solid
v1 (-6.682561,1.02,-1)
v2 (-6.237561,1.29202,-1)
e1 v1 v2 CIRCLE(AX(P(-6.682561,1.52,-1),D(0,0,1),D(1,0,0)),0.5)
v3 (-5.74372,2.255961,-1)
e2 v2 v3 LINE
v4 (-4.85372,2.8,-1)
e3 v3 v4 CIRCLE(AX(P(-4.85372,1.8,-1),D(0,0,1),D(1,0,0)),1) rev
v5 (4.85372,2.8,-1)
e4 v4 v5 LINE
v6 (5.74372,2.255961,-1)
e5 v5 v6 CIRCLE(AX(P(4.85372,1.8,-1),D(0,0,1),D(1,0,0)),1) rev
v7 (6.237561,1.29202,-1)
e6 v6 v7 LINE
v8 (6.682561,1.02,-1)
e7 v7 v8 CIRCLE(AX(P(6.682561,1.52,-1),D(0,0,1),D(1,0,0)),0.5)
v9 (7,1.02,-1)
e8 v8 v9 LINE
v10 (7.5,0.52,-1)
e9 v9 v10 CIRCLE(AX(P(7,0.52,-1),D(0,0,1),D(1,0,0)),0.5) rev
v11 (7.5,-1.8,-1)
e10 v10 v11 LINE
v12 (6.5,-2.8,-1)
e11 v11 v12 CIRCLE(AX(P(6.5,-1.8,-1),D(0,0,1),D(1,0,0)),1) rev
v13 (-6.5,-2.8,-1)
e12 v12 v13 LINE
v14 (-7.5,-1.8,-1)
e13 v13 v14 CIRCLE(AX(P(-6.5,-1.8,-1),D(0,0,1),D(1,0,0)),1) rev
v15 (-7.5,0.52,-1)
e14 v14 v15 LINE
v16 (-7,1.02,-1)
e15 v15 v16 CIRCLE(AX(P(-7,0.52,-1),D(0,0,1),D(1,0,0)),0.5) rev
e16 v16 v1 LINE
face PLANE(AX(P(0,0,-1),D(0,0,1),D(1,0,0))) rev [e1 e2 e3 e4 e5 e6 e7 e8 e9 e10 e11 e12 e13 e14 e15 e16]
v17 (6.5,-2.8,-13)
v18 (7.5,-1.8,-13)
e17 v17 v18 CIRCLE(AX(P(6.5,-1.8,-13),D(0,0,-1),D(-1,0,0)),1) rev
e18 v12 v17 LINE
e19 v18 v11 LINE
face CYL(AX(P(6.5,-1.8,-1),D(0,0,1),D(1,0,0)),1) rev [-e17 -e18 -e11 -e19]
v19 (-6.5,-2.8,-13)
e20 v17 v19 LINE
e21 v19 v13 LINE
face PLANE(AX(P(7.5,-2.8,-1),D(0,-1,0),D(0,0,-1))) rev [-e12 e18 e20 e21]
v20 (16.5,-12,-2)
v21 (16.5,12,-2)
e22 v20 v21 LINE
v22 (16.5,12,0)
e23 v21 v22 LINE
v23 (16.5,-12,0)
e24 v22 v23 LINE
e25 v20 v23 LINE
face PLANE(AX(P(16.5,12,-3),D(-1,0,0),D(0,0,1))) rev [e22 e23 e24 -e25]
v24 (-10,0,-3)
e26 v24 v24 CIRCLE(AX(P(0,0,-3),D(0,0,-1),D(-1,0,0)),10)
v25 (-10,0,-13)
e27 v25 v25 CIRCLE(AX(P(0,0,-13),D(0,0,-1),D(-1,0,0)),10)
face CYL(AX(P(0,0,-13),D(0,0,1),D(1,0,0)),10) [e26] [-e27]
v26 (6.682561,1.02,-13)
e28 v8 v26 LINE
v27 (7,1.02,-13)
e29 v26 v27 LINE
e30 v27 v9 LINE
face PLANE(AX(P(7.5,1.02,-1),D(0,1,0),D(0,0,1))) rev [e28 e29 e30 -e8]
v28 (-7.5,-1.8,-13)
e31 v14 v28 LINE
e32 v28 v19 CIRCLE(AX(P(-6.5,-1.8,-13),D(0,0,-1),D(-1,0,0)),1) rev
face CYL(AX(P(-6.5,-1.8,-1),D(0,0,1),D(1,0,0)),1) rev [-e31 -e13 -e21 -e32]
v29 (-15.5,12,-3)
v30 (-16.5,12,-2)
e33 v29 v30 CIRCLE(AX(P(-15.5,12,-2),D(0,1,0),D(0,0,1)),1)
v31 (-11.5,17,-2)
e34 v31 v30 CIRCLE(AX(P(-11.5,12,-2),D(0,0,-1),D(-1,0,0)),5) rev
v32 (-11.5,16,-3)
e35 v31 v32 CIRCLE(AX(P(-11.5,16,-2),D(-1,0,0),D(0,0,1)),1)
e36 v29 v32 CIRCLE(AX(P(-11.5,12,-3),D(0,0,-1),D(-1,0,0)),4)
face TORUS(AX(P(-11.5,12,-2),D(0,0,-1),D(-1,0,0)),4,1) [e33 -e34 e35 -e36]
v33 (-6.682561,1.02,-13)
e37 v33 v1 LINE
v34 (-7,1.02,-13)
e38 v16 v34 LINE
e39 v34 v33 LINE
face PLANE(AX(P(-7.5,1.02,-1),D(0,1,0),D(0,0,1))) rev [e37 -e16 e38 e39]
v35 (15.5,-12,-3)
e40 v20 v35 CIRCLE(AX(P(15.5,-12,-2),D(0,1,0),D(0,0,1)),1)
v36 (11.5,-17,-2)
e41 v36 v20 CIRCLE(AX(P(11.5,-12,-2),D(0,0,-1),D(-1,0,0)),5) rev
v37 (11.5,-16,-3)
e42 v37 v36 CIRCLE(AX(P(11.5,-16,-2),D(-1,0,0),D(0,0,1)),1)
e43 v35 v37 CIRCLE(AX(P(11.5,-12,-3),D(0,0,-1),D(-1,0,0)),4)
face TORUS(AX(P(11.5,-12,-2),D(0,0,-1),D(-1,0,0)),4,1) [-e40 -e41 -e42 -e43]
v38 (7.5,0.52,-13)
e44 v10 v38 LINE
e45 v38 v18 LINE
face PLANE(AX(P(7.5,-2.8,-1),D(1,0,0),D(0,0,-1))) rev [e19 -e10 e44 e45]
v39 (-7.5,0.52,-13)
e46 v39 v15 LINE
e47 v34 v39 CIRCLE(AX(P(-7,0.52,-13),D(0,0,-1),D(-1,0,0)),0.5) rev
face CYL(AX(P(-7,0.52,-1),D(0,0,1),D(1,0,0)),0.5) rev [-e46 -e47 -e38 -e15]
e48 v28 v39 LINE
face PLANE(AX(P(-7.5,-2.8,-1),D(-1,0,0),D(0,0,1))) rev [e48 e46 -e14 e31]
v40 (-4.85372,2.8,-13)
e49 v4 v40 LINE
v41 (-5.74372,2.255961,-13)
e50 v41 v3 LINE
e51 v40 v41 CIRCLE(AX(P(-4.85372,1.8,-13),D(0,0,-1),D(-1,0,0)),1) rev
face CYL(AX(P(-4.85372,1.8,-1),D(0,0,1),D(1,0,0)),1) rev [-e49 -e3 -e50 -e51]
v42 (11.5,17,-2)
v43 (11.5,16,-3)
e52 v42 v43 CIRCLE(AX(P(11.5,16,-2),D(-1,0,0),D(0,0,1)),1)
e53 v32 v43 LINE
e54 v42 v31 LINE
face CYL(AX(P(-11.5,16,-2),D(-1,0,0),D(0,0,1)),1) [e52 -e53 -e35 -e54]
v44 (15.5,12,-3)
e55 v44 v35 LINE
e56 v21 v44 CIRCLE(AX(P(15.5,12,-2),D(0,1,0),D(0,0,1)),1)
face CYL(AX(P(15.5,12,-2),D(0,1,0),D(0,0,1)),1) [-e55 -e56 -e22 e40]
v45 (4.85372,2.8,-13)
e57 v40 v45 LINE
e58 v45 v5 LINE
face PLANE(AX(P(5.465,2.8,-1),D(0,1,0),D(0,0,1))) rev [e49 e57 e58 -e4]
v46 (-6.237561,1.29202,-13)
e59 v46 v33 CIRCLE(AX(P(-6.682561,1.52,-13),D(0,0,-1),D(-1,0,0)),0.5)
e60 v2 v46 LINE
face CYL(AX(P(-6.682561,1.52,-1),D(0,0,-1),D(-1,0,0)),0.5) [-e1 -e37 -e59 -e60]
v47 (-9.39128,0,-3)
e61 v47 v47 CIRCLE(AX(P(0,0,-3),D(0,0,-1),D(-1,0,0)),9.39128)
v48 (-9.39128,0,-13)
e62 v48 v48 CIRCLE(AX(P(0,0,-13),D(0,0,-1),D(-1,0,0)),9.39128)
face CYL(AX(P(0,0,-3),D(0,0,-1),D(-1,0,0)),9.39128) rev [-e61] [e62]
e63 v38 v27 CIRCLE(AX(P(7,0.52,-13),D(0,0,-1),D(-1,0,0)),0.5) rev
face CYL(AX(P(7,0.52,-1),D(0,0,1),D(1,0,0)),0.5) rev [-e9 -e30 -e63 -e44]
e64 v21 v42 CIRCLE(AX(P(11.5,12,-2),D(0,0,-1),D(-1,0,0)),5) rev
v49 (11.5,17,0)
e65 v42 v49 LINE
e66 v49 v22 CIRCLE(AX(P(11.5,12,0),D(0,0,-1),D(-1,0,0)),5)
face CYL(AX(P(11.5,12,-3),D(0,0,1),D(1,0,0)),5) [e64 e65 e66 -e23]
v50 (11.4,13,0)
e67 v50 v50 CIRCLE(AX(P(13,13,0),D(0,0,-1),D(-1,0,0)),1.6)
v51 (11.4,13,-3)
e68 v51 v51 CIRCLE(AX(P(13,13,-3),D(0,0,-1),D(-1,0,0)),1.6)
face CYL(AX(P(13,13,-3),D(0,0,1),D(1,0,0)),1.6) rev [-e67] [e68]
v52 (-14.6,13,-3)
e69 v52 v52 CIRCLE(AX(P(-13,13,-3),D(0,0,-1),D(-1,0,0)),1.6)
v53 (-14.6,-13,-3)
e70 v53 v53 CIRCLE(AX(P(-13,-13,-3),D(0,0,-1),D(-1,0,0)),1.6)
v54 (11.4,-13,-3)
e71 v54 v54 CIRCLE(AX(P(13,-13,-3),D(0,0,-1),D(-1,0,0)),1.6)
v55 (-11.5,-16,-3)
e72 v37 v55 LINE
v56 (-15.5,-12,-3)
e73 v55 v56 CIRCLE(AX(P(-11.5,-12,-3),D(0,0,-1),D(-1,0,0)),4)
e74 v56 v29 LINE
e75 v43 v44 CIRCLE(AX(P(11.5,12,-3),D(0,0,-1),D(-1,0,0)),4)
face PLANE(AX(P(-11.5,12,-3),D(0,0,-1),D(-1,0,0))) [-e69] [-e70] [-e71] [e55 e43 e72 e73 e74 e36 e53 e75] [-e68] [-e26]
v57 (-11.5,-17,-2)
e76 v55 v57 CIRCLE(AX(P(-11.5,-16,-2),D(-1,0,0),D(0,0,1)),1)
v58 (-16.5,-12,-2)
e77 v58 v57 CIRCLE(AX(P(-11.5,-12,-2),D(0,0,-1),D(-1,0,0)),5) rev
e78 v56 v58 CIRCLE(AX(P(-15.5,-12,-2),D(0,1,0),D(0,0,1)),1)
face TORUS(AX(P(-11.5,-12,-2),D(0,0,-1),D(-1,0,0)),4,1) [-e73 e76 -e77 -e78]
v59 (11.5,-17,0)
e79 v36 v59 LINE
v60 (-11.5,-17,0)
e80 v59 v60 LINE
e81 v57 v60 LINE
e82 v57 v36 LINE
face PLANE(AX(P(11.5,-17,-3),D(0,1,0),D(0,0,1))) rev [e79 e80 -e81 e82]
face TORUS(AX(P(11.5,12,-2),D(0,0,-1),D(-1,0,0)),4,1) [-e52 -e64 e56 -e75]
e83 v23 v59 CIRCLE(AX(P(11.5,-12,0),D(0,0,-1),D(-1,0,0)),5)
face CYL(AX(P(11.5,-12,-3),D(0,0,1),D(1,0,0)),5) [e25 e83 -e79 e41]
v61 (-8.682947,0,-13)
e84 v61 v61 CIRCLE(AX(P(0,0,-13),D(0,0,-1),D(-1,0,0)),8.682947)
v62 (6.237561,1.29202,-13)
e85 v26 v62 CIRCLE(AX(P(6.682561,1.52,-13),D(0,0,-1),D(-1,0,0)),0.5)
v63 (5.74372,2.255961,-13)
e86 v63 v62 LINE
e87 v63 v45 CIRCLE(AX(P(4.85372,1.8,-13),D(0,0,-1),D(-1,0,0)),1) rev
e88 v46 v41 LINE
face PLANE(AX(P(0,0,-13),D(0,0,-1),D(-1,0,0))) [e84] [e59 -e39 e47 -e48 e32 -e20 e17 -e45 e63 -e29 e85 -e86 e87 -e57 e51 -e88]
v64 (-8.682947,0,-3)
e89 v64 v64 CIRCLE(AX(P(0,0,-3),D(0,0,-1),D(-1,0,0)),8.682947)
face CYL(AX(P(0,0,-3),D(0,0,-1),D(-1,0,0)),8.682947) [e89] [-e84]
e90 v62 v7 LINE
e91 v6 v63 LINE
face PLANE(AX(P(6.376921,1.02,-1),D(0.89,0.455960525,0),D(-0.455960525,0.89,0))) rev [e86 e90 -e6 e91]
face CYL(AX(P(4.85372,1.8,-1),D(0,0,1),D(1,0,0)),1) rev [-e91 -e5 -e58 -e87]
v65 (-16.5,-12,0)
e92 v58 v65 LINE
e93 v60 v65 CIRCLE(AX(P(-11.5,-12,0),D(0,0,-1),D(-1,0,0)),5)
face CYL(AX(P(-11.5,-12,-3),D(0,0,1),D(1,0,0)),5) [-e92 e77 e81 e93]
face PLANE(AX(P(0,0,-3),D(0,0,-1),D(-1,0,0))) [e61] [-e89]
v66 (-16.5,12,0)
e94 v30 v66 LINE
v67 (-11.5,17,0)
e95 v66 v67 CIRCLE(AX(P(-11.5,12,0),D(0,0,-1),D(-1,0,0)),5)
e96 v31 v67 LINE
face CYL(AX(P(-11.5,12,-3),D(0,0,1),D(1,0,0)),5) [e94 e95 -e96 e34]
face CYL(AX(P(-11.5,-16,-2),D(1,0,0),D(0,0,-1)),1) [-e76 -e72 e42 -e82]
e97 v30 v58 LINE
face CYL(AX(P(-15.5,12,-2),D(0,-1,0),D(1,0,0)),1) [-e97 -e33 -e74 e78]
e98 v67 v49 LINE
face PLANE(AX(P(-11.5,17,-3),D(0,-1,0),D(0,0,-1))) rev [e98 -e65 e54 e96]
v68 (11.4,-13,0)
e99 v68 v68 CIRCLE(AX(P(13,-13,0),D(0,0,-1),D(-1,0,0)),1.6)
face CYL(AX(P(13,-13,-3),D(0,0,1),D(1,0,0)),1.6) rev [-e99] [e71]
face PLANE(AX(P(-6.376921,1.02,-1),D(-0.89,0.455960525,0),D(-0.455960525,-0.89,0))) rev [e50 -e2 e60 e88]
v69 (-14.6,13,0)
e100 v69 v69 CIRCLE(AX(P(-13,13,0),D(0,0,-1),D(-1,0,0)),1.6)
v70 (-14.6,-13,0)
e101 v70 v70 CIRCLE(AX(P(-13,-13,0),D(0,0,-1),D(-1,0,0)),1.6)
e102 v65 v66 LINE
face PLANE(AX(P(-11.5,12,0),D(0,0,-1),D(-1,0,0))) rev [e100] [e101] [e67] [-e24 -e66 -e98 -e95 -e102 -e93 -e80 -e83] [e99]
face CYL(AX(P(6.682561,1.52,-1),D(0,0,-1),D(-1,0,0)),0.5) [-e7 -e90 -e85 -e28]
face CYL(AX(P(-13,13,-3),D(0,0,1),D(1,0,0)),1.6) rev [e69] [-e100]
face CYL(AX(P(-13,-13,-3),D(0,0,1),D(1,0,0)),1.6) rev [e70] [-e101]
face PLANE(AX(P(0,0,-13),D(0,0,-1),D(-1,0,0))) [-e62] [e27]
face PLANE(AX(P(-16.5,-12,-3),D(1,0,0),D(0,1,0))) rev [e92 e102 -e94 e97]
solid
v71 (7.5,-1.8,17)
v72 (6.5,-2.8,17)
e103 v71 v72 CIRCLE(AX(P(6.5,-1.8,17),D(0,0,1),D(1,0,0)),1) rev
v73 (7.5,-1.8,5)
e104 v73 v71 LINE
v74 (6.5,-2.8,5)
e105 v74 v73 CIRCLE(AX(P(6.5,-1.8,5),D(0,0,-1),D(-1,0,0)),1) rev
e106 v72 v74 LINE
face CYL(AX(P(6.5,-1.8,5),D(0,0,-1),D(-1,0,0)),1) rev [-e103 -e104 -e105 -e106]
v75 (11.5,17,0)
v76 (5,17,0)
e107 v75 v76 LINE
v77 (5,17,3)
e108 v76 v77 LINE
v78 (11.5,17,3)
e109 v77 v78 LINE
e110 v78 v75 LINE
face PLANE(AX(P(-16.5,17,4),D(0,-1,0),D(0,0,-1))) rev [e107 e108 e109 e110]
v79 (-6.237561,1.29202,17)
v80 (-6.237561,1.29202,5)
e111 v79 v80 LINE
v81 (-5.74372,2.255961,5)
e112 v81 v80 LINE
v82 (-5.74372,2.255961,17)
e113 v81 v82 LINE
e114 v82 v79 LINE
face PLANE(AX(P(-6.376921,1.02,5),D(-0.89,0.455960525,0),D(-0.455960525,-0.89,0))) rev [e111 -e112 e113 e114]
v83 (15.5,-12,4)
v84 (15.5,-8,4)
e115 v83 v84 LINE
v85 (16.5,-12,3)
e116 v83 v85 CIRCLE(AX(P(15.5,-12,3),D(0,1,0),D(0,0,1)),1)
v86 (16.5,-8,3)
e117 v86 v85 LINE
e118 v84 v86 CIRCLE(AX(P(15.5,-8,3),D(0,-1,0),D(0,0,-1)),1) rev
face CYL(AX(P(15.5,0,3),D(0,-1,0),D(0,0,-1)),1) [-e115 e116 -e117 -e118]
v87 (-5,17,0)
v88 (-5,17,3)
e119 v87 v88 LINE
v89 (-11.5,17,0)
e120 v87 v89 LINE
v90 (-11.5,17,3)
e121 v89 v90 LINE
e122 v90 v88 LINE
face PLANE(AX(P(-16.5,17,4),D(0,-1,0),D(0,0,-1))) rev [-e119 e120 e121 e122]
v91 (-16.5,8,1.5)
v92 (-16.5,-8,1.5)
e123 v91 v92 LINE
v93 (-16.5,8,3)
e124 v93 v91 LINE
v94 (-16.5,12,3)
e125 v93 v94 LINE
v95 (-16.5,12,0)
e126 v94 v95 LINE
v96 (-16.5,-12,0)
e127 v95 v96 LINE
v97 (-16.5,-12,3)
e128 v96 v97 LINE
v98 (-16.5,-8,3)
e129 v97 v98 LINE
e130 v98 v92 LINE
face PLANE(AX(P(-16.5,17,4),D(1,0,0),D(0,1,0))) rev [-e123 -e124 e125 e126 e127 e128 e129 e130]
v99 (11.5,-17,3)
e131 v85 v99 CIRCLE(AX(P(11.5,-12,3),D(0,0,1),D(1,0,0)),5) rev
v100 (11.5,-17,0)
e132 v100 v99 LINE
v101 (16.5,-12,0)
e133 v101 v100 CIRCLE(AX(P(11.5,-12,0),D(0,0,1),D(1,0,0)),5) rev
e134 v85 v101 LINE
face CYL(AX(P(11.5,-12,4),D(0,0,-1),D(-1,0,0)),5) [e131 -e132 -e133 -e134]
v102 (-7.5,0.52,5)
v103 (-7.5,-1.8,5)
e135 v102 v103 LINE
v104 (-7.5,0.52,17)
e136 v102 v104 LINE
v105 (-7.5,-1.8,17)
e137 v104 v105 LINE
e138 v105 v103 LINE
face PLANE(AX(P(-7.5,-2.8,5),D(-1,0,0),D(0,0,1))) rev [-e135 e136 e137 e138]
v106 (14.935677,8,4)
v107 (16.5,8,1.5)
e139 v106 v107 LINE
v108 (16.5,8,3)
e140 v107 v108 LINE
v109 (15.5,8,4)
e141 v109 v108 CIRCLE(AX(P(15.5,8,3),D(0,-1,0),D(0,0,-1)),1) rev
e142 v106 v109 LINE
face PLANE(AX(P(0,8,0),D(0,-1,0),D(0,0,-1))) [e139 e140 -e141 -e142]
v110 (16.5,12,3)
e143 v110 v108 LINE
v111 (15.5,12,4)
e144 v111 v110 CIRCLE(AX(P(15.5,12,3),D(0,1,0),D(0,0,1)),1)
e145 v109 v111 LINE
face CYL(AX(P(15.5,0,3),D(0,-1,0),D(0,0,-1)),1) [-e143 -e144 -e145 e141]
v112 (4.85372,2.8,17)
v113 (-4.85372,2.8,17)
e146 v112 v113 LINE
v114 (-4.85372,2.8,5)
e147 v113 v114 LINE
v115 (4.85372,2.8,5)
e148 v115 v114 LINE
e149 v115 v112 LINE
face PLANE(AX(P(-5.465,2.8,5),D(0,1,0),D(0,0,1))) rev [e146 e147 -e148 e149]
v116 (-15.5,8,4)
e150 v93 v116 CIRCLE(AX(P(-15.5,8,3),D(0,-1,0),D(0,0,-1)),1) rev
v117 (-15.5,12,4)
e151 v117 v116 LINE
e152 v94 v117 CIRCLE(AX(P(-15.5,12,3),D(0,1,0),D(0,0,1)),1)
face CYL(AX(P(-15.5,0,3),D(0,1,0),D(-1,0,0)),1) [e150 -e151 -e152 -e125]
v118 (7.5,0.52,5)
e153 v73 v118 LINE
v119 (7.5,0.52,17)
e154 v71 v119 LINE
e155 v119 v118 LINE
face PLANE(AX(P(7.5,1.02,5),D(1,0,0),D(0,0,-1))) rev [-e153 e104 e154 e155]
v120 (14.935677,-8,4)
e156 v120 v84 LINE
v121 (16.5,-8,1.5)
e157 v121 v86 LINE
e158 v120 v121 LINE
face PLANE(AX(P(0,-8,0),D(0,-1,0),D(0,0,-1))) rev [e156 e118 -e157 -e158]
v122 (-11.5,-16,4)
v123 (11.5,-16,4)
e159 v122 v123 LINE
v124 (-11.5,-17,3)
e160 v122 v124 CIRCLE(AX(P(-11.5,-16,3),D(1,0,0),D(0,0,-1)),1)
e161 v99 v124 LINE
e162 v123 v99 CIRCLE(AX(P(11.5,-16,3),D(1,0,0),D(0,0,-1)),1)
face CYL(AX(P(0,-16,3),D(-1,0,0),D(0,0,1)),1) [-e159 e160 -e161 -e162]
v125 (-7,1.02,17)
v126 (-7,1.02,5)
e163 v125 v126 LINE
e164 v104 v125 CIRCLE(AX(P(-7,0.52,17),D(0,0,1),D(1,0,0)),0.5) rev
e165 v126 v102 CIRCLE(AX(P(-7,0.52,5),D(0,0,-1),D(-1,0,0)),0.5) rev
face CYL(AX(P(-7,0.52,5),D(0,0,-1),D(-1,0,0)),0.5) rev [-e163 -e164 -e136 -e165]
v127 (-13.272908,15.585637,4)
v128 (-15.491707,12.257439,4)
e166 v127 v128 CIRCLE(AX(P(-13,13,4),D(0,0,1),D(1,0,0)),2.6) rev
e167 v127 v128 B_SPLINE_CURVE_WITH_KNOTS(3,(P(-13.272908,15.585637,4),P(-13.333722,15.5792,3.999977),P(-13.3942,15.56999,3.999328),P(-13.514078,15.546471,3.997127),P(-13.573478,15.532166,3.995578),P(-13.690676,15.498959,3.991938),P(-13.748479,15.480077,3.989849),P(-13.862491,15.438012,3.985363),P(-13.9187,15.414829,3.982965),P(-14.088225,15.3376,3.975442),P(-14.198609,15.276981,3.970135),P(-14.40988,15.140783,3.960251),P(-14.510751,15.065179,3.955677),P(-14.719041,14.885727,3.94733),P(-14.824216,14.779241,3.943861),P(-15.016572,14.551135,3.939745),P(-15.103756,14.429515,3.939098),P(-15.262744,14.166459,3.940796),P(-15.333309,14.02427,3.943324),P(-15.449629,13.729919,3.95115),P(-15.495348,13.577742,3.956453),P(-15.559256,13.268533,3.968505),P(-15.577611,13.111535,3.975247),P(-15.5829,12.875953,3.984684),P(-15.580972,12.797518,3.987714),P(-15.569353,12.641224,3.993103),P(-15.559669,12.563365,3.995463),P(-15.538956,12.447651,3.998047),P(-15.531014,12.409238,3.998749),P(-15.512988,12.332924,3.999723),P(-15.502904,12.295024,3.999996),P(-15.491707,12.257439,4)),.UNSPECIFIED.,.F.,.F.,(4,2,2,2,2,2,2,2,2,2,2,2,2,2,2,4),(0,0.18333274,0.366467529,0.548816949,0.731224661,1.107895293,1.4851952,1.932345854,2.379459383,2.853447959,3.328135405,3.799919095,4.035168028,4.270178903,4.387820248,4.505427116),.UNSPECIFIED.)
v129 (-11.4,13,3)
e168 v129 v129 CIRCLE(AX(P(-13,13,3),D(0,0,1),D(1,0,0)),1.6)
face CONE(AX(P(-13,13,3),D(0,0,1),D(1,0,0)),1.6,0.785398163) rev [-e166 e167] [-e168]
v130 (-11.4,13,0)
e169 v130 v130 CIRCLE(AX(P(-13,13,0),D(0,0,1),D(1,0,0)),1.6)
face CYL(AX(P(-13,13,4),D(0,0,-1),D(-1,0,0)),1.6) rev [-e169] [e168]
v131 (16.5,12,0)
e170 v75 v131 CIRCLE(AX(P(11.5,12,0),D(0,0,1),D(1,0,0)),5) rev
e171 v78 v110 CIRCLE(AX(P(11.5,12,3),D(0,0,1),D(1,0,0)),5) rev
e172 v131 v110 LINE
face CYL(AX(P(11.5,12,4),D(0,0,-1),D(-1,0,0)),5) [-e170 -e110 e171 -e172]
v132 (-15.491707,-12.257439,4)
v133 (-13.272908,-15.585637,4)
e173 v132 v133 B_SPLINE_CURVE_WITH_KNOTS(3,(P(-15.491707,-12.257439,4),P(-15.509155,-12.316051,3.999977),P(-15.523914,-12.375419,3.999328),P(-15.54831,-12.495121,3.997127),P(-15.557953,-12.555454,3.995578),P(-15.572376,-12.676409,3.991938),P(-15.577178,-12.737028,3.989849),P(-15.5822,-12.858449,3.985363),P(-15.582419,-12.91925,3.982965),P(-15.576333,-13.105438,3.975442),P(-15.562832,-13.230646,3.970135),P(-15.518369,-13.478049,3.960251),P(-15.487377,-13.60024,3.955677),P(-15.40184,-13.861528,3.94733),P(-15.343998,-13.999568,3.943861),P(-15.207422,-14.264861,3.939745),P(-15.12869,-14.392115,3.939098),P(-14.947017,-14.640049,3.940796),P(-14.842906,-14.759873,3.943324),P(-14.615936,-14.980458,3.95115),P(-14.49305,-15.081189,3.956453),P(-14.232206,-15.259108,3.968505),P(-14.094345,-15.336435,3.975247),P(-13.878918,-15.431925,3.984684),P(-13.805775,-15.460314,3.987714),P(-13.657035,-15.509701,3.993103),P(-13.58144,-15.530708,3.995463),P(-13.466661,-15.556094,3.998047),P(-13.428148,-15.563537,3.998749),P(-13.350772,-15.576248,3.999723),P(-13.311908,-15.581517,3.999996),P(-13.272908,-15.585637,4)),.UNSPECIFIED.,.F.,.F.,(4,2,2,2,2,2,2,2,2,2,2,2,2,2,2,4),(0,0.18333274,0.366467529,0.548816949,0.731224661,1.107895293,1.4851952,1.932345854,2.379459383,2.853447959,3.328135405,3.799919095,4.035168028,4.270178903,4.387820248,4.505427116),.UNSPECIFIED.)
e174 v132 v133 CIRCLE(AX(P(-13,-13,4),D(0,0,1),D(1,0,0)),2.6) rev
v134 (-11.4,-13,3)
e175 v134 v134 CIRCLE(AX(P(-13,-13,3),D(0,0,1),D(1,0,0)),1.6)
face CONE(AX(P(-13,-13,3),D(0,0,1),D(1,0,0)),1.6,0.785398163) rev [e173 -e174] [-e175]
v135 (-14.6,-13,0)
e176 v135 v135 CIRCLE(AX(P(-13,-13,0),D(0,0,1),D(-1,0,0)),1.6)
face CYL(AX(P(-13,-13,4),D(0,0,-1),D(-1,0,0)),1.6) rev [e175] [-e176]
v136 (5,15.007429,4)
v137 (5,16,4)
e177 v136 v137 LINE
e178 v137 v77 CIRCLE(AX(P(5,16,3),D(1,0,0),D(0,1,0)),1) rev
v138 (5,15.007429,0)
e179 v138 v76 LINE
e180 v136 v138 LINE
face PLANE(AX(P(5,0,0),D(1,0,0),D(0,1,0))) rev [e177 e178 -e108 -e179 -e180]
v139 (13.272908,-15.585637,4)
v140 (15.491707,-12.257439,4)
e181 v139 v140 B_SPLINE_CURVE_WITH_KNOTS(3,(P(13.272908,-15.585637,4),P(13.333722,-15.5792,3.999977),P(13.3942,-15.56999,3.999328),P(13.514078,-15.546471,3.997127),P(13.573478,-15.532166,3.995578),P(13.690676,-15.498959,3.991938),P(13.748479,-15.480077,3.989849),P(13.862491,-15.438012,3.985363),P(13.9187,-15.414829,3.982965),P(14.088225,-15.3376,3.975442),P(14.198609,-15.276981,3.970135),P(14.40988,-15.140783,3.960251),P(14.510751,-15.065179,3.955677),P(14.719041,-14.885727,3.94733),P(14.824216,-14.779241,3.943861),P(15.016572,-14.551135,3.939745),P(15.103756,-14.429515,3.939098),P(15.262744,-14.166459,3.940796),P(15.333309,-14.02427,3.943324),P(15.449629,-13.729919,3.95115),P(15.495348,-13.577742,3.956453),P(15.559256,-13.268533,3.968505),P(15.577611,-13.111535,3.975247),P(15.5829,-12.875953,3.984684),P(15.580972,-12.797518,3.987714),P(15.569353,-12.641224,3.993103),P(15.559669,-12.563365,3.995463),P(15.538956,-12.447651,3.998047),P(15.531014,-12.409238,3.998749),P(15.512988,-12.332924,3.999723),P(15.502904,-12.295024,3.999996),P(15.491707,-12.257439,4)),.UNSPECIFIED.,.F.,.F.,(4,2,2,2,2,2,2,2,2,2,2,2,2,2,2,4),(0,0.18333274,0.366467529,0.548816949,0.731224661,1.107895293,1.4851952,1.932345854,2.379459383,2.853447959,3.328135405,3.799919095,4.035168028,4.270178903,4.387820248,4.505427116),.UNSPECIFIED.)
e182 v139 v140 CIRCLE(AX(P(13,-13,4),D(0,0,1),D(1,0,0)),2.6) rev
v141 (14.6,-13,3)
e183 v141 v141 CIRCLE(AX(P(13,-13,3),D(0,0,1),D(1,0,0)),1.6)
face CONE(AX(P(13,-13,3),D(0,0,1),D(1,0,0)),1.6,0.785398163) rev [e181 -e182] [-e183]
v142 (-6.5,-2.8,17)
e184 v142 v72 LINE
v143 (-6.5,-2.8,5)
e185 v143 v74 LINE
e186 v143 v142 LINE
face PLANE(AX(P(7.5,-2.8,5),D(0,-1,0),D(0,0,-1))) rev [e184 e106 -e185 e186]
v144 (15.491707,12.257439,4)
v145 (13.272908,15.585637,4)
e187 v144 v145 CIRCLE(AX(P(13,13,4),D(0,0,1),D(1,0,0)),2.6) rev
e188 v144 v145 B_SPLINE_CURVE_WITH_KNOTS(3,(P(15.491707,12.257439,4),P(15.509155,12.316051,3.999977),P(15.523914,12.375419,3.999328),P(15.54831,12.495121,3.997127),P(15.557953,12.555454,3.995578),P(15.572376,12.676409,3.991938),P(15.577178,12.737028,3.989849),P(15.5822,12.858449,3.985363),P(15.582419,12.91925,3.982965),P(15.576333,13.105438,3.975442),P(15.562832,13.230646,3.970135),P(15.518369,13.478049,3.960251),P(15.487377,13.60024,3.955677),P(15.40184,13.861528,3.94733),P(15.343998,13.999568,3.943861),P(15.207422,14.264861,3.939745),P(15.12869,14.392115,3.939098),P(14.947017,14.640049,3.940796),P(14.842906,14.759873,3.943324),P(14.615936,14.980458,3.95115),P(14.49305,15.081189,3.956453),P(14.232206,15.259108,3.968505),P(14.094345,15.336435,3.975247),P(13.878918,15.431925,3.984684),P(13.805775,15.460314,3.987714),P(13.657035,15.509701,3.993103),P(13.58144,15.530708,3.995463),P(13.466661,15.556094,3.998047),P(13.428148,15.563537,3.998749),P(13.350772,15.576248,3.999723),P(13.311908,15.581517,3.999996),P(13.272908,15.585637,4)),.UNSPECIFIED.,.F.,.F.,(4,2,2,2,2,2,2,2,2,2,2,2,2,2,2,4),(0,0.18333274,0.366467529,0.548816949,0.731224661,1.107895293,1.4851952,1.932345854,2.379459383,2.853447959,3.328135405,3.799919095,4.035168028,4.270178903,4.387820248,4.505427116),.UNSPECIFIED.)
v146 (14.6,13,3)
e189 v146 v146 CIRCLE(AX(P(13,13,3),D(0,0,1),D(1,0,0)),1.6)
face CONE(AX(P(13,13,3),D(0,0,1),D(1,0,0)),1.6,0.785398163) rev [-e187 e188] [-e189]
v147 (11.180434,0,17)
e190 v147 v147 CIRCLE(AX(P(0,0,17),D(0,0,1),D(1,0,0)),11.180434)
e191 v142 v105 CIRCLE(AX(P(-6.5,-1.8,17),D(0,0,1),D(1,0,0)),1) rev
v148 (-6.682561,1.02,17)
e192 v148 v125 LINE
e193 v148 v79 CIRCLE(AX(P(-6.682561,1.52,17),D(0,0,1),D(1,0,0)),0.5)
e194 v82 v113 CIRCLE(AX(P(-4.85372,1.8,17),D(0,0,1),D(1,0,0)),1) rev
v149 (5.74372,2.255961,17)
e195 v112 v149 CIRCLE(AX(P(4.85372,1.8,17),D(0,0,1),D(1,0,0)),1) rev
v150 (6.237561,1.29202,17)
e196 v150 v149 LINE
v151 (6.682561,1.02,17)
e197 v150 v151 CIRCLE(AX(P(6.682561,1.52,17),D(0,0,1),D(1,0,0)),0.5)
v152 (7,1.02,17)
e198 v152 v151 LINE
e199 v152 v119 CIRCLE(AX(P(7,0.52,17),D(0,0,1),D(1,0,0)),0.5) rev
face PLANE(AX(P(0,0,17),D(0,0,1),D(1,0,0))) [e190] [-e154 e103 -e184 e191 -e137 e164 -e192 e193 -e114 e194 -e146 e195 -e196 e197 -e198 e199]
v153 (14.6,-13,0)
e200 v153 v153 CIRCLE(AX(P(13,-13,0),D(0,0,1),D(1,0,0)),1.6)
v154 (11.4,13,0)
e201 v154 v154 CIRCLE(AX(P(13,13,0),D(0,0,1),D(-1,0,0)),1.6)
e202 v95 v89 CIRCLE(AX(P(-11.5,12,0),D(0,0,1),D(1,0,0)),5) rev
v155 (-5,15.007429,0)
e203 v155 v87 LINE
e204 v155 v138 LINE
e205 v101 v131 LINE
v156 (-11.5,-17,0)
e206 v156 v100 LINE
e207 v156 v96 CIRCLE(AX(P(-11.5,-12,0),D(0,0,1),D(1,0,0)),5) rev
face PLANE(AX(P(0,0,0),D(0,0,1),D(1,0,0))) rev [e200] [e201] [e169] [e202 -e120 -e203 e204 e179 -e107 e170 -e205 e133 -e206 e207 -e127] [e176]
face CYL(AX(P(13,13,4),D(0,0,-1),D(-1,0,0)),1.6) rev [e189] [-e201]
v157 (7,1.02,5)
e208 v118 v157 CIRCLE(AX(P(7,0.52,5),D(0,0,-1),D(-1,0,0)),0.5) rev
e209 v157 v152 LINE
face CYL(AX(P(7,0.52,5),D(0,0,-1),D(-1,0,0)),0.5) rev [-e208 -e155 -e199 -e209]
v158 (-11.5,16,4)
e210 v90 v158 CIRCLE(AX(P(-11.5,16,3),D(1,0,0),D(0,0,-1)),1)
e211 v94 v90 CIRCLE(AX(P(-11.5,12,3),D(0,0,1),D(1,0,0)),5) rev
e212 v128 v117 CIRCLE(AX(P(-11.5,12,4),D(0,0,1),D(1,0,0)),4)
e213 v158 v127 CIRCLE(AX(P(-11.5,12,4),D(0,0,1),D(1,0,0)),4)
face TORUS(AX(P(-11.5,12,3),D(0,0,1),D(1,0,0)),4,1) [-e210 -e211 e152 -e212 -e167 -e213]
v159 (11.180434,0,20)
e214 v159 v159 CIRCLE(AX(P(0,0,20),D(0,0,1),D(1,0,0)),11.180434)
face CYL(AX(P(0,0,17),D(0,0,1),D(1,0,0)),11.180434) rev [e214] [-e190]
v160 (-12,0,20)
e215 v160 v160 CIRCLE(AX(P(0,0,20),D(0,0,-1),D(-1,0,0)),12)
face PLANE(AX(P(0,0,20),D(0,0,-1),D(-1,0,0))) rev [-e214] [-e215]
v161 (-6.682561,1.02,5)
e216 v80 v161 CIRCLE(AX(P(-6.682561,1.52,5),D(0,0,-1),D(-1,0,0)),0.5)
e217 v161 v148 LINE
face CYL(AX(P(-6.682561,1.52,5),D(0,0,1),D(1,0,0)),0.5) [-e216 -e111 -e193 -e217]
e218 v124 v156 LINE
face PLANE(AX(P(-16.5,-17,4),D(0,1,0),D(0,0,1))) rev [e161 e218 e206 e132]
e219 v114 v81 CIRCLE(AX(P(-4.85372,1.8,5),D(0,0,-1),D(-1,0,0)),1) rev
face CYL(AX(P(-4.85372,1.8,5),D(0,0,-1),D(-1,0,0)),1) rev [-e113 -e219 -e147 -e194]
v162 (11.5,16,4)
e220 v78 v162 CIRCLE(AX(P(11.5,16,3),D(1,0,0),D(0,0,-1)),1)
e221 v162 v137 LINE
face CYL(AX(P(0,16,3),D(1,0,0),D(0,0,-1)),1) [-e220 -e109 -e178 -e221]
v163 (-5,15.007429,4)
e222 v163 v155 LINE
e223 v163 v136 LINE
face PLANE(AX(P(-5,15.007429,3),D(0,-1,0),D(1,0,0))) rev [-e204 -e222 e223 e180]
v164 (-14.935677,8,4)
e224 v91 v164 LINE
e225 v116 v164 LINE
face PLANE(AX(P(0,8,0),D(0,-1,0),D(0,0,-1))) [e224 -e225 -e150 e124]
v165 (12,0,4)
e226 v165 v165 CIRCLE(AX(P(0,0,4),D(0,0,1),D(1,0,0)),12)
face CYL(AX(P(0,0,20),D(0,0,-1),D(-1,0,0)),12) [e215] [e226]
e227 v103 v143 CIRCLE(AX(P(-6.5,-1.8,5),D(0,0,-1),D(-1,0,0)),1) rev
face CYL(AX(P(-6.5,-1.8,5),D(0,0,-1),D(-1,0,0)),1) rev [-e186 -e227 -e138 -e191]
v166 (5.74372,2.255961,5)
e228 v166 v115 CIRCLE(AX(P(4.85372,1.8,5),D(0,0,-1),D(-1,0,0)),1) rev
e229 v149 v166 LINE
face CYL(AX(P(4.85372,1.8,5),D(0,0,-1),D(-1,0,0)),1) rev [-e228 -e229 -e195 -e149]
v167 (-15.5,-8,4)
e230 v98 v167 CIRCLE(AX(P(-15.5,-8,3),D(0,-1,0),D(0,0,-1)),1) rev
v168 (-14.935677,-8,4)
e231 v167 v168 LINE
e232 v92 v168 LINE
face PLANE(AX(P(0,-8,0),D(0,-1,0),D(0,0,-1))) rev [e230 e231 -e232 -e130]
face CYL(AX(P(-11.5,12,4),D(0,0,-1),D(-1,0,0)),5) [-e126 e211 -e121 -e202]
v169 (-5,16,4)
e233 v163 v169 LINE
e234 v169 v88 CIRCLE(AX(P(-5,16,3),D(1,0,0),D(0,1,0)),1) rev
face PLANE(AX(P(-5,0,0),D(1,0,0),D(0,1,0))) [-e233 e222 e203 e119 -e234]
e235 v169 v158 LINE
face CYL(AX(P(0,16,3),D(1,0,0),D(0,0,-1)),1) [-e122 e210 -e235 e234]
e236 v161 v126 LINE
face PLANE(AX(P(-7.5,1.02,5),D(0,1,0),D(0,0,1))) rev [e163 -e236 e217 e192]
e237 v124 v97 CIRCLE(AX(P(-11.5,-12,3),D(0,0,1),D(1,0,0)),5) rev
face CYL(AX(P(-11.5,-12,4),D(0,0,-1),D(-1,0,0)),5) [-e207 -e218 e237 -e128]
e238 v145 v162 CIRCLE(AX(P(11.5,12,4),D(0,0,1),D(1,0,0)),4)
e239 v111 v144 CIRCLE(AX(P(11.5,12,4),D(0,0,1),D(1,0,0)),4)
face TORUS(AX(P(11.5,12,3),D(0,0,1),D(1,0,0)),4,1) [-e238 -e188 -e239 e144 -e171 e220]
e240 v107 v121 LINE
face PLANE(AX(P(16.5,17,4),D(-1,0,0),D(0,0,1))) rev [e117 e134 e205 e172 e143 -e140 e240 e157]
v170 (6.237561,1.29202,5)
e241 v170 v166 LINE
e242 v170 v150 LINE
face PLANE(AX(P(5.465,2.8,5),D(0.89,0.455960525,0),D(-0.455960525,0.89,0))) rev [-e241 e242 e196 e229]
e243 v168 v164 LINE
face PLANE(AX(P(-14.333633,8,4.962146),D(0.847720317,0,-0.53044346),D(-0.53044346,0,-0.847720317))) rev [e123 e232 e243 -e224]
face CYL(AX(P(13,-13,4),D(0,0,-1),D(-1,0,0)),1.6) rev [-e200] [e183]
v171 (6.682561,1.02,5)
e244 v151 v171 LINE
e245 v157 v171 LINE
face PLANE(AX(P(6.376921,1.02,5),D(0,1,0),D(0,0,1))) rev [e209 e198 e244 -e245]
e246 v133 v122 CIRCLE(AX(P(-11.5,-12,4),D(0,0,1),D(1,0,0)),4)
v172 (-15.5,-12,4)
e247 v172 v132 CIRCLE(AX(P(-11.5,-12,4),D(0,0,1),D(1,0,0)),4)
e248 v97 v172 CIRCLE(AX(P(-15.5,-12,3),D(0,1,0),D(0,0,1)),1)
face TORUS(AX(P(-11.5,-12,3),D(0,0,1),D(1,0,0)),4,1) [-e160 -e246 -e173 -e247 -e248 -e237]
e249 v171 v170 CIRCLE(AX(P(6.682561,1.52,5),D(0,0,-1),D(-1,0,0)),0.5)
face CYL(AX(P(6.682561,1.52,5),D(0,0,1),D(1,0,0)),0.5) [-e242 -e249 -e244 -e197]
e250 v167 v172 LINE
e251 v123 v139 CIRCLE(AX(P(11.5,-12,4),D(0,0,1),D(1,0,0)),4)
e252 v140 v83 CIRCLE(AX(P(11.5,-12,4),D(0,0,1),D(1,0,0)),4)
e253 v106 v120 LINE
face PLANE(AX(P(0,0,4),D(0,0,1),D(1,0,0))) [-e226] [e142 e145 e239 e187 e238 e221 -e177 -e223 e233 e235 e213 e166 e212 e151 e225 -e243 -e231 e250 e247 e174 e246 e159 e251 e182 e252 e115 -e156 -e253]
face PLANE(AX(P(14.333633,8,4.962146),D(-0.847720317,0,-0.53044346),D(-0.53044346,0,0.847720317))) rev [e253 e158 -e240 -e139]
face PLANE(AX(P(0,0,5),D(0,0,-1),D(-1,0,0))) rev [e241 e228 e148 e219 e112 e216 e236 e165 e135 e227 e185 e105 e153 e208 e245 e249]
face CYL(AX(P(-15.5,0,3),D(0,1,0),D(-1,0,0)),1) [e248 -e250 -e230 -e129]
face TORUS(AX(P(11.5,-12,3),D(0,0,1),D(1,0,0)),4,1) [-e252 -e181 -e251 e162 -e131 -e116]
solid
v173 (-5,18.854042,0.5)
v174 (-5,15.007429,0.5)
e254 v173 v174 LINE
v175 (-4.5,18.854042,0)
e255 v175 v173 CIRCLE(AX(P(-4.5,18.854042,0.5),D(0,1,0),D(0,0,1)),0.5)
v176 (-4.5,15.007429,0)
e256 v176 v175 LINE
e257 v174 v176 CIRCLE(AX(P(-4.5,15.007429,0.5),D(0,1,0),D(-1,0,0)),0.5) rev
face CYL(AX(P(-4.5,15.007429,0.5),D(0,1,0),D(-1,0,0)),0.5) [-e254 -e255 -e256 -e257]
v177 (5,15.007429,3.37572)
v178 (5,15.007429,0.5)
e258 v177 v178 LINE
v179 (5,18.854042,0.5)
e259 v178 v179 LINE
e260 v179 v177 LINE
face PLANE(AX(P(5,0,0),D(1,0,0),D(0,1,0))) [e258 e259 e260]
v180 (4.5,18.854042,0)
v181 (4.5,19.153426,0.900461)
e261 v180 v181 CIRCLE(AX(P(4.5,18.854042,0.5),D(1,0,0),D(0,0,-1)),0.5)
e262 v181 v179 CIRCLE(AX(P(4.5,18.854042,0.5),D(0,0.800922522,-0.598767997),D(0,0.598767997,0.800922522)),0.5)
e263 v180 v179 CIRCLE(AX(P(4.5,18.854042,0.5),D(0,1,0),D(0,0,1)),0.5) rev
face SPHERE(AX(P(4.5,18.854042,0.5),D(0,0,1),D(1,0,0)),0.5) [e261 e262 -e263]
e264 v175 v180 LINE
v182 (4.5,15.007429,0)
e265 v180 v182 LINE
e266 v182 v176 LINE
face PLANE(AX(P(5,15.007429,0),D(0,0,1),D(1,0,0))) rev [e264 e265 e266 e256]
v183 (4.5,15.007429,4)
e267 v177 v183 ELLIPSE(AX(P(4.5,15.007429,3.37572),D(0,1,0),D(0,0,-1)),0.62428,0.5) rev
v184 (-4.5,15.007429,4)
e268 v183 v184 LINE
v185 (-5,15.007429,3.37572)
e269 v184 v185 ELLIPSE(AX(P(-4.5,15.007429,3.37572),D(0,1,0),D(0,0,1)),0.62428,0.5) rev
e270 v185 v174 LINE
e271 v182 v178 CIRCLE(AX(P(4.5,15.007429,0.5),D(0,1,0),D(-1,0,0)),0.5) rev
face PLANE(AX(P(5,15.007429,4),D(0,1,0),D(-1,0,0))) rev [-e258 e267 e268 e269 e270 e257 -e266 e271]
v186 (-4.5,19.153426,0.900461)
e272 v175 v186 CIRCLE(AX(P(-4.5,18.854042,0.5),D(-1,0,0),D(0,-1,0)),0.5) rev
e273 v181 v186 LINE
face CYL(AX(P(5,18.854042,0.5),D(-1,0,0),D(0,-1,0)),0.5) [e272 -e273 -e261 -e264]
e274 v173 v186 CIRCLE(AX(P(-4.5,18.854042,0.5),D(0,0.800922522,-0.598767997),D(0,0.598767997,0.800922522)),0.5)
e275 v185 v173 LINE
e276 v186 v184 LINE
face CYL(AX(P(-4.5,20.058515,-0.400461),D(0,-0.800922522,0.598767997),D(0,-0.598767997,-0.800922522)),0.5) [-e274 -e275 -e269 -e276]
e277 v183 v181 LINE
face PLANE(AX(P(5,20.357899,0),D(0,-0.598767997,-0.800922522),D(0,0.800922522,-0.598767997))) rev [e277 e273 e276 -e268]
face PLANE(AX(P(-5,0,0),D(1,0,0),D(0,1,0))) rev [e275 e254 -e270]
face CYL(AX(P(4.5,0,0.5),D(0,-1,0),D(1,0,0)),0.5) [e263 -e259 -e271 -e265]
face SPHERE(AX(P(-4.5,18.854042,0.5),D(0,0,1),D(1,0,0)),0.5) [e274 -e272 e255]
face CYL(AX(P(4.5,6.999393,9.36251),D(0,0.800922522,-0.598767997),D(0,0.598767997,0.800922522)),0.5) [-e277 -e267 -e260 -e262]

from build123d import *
from OCP.BRepFilletAPI import BRepFilletAPI_MakeFillet

# Parameters (mm, degrees)
SKETCH1_W           = 33
SKETCH1_H           = 34
SKETCH1_R           = 12
SKETCH1_R_2         = 1.6
BOSS_EXTRUDE1_DEPTH = 4
SKETCH2_R           = 12
BOSS_EXTRUDE2_DEPTH = 20
FILLET1_R           = 5
CHAMFER1_SIZE       = 1
SKETCH3_R           = 1.6
BOSS_EXTRUDE3_DEPTH = 3
SKETCH5_R           = 10
BOSS_EXTRUDE4_DEPTH = 10
CUT_EXTRUDE1_DEPTH  = 12
SKETCH9_R           = 9.391280131
SKETCH9_R_2         = 8.682947415
CUT_EXTRUDE2_DEPTH  = 10
SKETCH10_R          = 11.180433554
CUT_EXTRUDE3_DEPTH  = 3
CUT_EXTRUDE4_DEPTH  = 12
FILLET3_R1          = 0.5
FILLET3_R2          = 1
FILLET4_R1          = 0.5
FILLET4_R2          = 1
FILLET5_R           = 1
FILLET6_R           = 1
CUT_EXTRUDE5_DEPTH  = 8
CUT_EXTRUDE6_DEPTH  = 5
BOSS_EXTRUDE5_DEPTH = 5
FILLET7_R           = 0.5


with BuildPart() as part:
    # Sketch1 → Boss-Extrude1 (new body)
    with BuildSketch(Plane.XY):
        Rectangle(SKETCH1_W, SKETCH1_H)
        Circle(SKETCH1_R, mode=Mode.SUBTRACT)
        with Locations((-13, 13)):
            Circle(SKETCH1_R_2, mode=Mode.SUBTRACT)
        with Locations((13, -13)):
            Circle(SKETCH1_R_2, mode=Mode.SUBTRACT)
        with Locations(Location((-13, -13, 0), (0, 0, 180))):
            Circle(SKETCH1_R_2, mode=Mode.SUBTRACT)
        with Locations(Location((13, 13, 0), (0, 0, 180))):
            Circle(SKETCH1_R_2, mode=Mode.SUBTRACT)
    extrude(amount=BOSS_EXTRUDE1_DEPTH)

    # Sketch2 → Boss-Extrude2 (add)
    with BuildSketch(Plane(origin=(0, 0, 0), x_dir=(-1, 0, 0), z_dir=(0, 0, -1))):
        Circle(SKETCH2_R)
    extrude(amount=-BOSS_EXTRUDE2_DEPTH)

    # Fillet1
    fillet1_edges = [part.edges().sort_by_distance(p)[0] for p in [
        (16.5, -17, 2),
        (-16.5, -17, 2),
        (-16.5, 17, 2),
        (16.5, 17, 2),
    ]]
    fillet(fillet1_edges, radius=FILLET1_R)

    # Chamfer1
    chamfer1_edges = [part.edges().sort_by_distance(p)[0] for p in [
        (-14.6, 13, 4),
        (11.4, -13, 4),
        (-11.4, -13, 4),
        (14.6, 13, 4),
    ]]
    chamfer(chamfer1_edges, length=CHAMFER1_SIZE)

    # Sketch10 → Cut-Extrude3 (cut)
    with BuildSketch(Plane.XY.offset(20)):
        Circle(SKETCH10_R)
    extrude(amount=-CUT_EXTRUDE3_DEPTH, mode=Mode.SUBTRACT)

    # Sketch11 → Cut-Extrude4 (cut)
    with BuildSketch(Plane.XY.offset(17)):
        Polygon((7.5, 1.02), (7.5, -2.8), (-7.5, -2.8), (-7.5, 1.02), (-6.376921049, 1.02), (-5.465, 2.8), (5.465, 2.8), (6.376921049, 1.02), align=None)
    extrude(amount=-CUT_EXTRUDE4_DEPTH, mode=Mode.SUBTRACT)

    # Fillet3: one fillet with a radius per group of edges: ONE call of the kernel's fillet builder (fillet() takes one radius for all edges)
    fillet3_edges_1 = [part.edges().sort_by_distance(p)[0] for p in [
        (-6.376921049, 1.02, 11),
        (-7.5, 1.02, 11),
        (6.376921049, 1.02, 11),
        (7.5, 1.02, 11),
    ]]
    fillet3_edges_2 = [part.edges().sort_by_distance(p)[0] for p in [
        (-5.465, 2.8, 11),
        (-7.5, -2.8, 11),
        (7.5, -2.8, 11),
        (5.465, 2.8, 11),
    ]]
    fillet3 = BRepFilletAPI_MakeFillet(part.part.solid().wrapped)
    for e in fillet3_edges_1:
        fillet3.Add(FILLET3_R1, e.wrapped)
    for e in fillet3_edges_2:
        fillet3.Add(FILLET3_R2, e.wrapped)
    add(Compound.cast(fillet3.Shape()), mode=Mode.REPLACE)

    # Fillet5
    # the kernel refuses this fillet: 1 mm, written as the material it takes off along each edge
    with BuildSketch(Plane(origin=(-11.5, 17, 4), x_dir=(0, -1, 0), z_dir=(1, 0, 0)), Plane(origin=(11.5, -17, 4), x_dir=(0, 1, 0), z_dir=(-1, 0, 0))) as fillet5_piece_1:
        with BuildLine():
            CenterArc((FILLET5_R, FILLET5_R), FILLET5_R, 180, 90)
            Line((0, FILLET5_R), (0, 0))
            Line((0, 0), (FILLET5_R, 0))
        make_face()
    extrude(amount=23, mode=Mode.SUBTRACT)
    with BuildSketch(Plane(origin=(16.5, 12, 4), x_dir=(-1, 0, 0), z_dir=(0, -1, 0)), Plane(origin=(-16.5, -12, 4), x_dir=(1, 0, 0), z_dir=(0, 1, 0))) as fillet5_piece_2:
        with BuildLine():
            CenterArc((FILLET5_R, FILLET5_R), FILLET5_R, 180, 90)
            Line((0, FILLET5_R), (0, 0))
            Line((0, 0), (FILLET5_R, 0))
        make_face()
    extrude(amount=24, mode=Mode.SUBTRACT)
    with BuildSketch(Plane(origin=(-11.5, 12, 4), x_dir=(0, 1, 0), z_dir=(1, 0, 0))) as fillet5_piece_3:
        with BuildLine():
            CenterArc((5 - FILLET5_R, -FILLET5_R), FILLET5_R, 0, 90)
            Line((5, -FILLET5_R), (5, 0))
            Line((5, 0), (5 - FILLET5_R, 0))
        make_face()
    revolve(axis=Axis((-11.5, 12, 4), (0, 0, 1)), revolution_arc=90, mode=Mode.SUBTRACT)
    with BuildSketch(Plane(origin=(-11.5, -12, 4), x_dir=(0, -1, 0), z_dir=(1, 0, 0))) as fillet5_piece_4:
        with BuildLine():
            CenterArc((5 - FILLET5_R, FILLET5_R), FILLET5_R, 270, 90)
            Line((5, FILLET5_R), (5, 0))
            Line((5, 0), (5 - FILLET5_R, 0))
        make_face()
    revolve(axis=Axis((-11.5, -12, 4), (0, 0, -1)), revolution_arc=90, mode=Mode.SUBTRACT)
    with BuildSketch(Plane(origin=(11.5, -12, 4), x_dir=(0, -1, 0), z_dir=(-1, 0, 0))) as fillet5_piece_5:
        with BuildLine():
            CenterArc((5 - FILLET5_R, -FILLET5_R), FILLET5_R, 0, 90)
            Line((5, -FILLET5_R), (5, 0))
            Line((5, 0), (5 - FILLET5_R, 0))
        make_face()
    revolve(axis=Axis((11.5, -12, 4), (0, 0, 1)), revolution_arc=90, mode=Mode.SUBTRACT)
    with BuildSketch(Plane(origin=(11.5, 12, 4), x_dir=(0, 1, 0), z_dir=(-1, 0, 0))) as fillet5_piece_6:
        with BuildLine():
            CenterArc((5 - FILLET5_R, FILLET5_R), FILLET5_R, 270, 90)
            Line((5, FILLET5_R), (5, 0))
            Line((5, 0), (5 - FILLET5_R, 0))
        make_face()
    revolve(axis=Axis((11.5, 12, 4), (0, 0, -1)), revolution_arc=90, mode=Mode.SUBTRACT)

    # Sketch12 → Cut-Extrude5 (cut, symmetric)
    with BuildSketch(Plane(origin=(0, 0, 0), x_dir=(-1, 0, 0), z_dir=(0, -1, 0))):
        Polygon((14.333633482, -4.962146393), (16.5, -1.5), (16.5, -3), (16.5, -4.962146393), align=None)
        Polygon((-16.5, -4.962146393), (-14.333633482, -4.962146393), (-16.5, -1.5), (-16.5, -3), align=None)
    extrude(amount=CUT_EXTRUDE5_DEPTH, both=True, mode=Mode.SUBTRACT)

    # Sketch13 → Cut-Extrude6 (cut, symmetric)
    with BuildSketch(Plane(origin=(0, 0, 0), x_dir=(0, 0, -1), z_dir=(1, 0, 0))):
        Polygon((-3, 17), (0, 17), (0, 15.007428725), (-3, 15.007428725), (-4.179389898, 15.007428725), (-4.179389898, 17), align=None)
    extrude(amount=CUT_EXTRUDE6_DEPTH, both=True, mode=Mode.SUBTRACT)


with BuildPart() as body_2:
    # Sketch3 → Boss-Extrude3 (new body)
    with BuildSketch(Plane(origin=(0, 0, 0), x_dir=(-1, 0, 0), z_dir=(0, 0, -1))):
        with BuildLine():
            Line((11.5, 17), (-11.5, 17))
            ThreePointArc((-11.5, 17), (-15.035533906, 15.535533906), (-16.5, 12))
            Line((-16.5, 12), (-16.5, -12))
            ThreePointArc((-16.5, -12), (-15.035533906, -15.535533906), (-11.5, -17))
            Line((-11.5, -17), (11.5, -17))
            ThreePointArc((11.5, -17), (15.035533906, -15.535533906), (16.5, -12))
            Line((16.5, -12), (16.5, 12))
            ThreePointArc((16.5, 12), (15.035533906, 15.535533906), (11.5, 17))
        make_face()
        with Locations((13, 13)):
            Circle(SKETCH3_R, mode=Mode.SUBTRACT)
        with Locations((-13, -13)):
            Circle(SKETCH3_R, mode=Mode.SUBTRACT)
        with Locations((-13, 13)):
            Circle(SKETCH3_R, mode=Mode.SUBTRACT)
        with Locations((13, -13)):
            Circle(SKETCH3_R, mode=Mode.SUBTRACT)
    extrude(amount=BOSS_EXTRUDE3_DEPTH)

    # Sketch5 → Boss-Extrude4 (add)
    with BuildSketch(Plane(origin=(0, 0, -3), x_dir=(-1, 0, 0), z_dir=(0, 0, -1))):
        Circle(SKETCH5_R)
    extrude(amount=BOSS_EXTRUDE4_DEPTH)

    # Sketch6 → Cut-Extrude1 (cut)
    with BuildSketch(Plane(origin=(0, 0, -13), x_dir=(-1, 0, 0), z_dir=(0, 0, -1))):
        Polygon((-7.5, -2.8), (7.5, -2.8), (7.5, 1.02), (6.376921049, 1.02), (5.465, 2.8), (-5.465, 2.8), (-6.376921049, 1.02), (-7.5, 1.02), align=None)
    extrude(amount=-CUT_EXTRUDE1_DEPTH, mode=Mode.SUBTRACT)

    # Sketch9 → Cut-Extrude2 (cut)
    with BuildSketch(Plane(origin=(0, 0, -13), x_dir=(-1, 0, 0), z_dir=(0, 0, -1))):
        Circle(SKETCH9_R)
        Circle(SKETCH9_R_2, mode=Mode.SUBTRACT)
    extrude(amount=-CUT_EXTRUDE2_DEPTH, mode=Mode.SUBTRACT)

    # Fillet4: one fillet with a radius per group of edges: ONE call of the kernel's fillet builder (fillet() takes one radius for all edges)
    fillet4_edges_1 = [body_2.edges().sort_by_distance(p)[0] for p in [
        (6.376921049, 1.02, -7),
        (7.5, 1.02, -7),
        (-6.376921049, 1.02, -7),
        (-7.5, 1.02, -7),
    ]]
    fillet4_edges_2 = [body_2.edges().sort_by_distance(p)[0] for p in [
        (5.465, 2.8, -7),
        (-5.465, 2.8, -7),
        (7.5, -2.8, -7),
        (-7.5, -2.8, -7),
    ]]
    fillet4 = BRepFilletAPI_MakeFillet(body_2.part.solid().wrapped)
    for e in fillet4_edges_1:
        fillet4.Add(FILLET4_R1, e.wrapped)
    for e in fillet4_edges_2:
        fillet4.Add(FILLET4_R2, e.wrapped)
    add(Compound.cast(fillet4.Shape()), mode=Mode.REPLACE)

    # Fillet6
    fillet6_edges = [body_2.edges().sort_by_distance(p)[0] for p in [
        (15.035533906, 15.535533906, -3),
        (16.5, 0, -3),
        (15.035533906, -15.535533906, -3),
        (0, -17, -3),
        (-15.035533906, -15.535533906, -3),
        (-16.5, 0, -3),
        (-15.035533906, 15.535533906, -3),
        (0, 17, -3),
    ]]
    fillet(fillet6_edges, radius=FILLET6_R)


with BuildPart() as body_3:
    # Sketch14 → Boss-Extrude5 (new, symmetric)
    with BuildSketch(Plane(origin=(0, 0, 0), x_dir=(0, 0, -1), z_dir=(1, 0, 0))):
        Polygon((-4, 15.007428725), (0, 15.007428725), (0, 20.357898526), align=None)
    extrude(amount=BOSS_EXTRUDE5_DEPTH, both=True)

    # Fillet7
    fillet7_edges = [body_3.edges().sort_by_distance(p)[0] for p in [
        (5, 17.682663626, 0),
        (-5, 17.682663626, 0),
        (5, 17.682663626, 2),
        (-5, 17.682663626, 2),
        (0, 20.357898526, 0),
    ]]
    fillet(fillet7_edges, radius=FILLET7_R)


solid = Compound([part.part, body_2.part, body_3.part])
